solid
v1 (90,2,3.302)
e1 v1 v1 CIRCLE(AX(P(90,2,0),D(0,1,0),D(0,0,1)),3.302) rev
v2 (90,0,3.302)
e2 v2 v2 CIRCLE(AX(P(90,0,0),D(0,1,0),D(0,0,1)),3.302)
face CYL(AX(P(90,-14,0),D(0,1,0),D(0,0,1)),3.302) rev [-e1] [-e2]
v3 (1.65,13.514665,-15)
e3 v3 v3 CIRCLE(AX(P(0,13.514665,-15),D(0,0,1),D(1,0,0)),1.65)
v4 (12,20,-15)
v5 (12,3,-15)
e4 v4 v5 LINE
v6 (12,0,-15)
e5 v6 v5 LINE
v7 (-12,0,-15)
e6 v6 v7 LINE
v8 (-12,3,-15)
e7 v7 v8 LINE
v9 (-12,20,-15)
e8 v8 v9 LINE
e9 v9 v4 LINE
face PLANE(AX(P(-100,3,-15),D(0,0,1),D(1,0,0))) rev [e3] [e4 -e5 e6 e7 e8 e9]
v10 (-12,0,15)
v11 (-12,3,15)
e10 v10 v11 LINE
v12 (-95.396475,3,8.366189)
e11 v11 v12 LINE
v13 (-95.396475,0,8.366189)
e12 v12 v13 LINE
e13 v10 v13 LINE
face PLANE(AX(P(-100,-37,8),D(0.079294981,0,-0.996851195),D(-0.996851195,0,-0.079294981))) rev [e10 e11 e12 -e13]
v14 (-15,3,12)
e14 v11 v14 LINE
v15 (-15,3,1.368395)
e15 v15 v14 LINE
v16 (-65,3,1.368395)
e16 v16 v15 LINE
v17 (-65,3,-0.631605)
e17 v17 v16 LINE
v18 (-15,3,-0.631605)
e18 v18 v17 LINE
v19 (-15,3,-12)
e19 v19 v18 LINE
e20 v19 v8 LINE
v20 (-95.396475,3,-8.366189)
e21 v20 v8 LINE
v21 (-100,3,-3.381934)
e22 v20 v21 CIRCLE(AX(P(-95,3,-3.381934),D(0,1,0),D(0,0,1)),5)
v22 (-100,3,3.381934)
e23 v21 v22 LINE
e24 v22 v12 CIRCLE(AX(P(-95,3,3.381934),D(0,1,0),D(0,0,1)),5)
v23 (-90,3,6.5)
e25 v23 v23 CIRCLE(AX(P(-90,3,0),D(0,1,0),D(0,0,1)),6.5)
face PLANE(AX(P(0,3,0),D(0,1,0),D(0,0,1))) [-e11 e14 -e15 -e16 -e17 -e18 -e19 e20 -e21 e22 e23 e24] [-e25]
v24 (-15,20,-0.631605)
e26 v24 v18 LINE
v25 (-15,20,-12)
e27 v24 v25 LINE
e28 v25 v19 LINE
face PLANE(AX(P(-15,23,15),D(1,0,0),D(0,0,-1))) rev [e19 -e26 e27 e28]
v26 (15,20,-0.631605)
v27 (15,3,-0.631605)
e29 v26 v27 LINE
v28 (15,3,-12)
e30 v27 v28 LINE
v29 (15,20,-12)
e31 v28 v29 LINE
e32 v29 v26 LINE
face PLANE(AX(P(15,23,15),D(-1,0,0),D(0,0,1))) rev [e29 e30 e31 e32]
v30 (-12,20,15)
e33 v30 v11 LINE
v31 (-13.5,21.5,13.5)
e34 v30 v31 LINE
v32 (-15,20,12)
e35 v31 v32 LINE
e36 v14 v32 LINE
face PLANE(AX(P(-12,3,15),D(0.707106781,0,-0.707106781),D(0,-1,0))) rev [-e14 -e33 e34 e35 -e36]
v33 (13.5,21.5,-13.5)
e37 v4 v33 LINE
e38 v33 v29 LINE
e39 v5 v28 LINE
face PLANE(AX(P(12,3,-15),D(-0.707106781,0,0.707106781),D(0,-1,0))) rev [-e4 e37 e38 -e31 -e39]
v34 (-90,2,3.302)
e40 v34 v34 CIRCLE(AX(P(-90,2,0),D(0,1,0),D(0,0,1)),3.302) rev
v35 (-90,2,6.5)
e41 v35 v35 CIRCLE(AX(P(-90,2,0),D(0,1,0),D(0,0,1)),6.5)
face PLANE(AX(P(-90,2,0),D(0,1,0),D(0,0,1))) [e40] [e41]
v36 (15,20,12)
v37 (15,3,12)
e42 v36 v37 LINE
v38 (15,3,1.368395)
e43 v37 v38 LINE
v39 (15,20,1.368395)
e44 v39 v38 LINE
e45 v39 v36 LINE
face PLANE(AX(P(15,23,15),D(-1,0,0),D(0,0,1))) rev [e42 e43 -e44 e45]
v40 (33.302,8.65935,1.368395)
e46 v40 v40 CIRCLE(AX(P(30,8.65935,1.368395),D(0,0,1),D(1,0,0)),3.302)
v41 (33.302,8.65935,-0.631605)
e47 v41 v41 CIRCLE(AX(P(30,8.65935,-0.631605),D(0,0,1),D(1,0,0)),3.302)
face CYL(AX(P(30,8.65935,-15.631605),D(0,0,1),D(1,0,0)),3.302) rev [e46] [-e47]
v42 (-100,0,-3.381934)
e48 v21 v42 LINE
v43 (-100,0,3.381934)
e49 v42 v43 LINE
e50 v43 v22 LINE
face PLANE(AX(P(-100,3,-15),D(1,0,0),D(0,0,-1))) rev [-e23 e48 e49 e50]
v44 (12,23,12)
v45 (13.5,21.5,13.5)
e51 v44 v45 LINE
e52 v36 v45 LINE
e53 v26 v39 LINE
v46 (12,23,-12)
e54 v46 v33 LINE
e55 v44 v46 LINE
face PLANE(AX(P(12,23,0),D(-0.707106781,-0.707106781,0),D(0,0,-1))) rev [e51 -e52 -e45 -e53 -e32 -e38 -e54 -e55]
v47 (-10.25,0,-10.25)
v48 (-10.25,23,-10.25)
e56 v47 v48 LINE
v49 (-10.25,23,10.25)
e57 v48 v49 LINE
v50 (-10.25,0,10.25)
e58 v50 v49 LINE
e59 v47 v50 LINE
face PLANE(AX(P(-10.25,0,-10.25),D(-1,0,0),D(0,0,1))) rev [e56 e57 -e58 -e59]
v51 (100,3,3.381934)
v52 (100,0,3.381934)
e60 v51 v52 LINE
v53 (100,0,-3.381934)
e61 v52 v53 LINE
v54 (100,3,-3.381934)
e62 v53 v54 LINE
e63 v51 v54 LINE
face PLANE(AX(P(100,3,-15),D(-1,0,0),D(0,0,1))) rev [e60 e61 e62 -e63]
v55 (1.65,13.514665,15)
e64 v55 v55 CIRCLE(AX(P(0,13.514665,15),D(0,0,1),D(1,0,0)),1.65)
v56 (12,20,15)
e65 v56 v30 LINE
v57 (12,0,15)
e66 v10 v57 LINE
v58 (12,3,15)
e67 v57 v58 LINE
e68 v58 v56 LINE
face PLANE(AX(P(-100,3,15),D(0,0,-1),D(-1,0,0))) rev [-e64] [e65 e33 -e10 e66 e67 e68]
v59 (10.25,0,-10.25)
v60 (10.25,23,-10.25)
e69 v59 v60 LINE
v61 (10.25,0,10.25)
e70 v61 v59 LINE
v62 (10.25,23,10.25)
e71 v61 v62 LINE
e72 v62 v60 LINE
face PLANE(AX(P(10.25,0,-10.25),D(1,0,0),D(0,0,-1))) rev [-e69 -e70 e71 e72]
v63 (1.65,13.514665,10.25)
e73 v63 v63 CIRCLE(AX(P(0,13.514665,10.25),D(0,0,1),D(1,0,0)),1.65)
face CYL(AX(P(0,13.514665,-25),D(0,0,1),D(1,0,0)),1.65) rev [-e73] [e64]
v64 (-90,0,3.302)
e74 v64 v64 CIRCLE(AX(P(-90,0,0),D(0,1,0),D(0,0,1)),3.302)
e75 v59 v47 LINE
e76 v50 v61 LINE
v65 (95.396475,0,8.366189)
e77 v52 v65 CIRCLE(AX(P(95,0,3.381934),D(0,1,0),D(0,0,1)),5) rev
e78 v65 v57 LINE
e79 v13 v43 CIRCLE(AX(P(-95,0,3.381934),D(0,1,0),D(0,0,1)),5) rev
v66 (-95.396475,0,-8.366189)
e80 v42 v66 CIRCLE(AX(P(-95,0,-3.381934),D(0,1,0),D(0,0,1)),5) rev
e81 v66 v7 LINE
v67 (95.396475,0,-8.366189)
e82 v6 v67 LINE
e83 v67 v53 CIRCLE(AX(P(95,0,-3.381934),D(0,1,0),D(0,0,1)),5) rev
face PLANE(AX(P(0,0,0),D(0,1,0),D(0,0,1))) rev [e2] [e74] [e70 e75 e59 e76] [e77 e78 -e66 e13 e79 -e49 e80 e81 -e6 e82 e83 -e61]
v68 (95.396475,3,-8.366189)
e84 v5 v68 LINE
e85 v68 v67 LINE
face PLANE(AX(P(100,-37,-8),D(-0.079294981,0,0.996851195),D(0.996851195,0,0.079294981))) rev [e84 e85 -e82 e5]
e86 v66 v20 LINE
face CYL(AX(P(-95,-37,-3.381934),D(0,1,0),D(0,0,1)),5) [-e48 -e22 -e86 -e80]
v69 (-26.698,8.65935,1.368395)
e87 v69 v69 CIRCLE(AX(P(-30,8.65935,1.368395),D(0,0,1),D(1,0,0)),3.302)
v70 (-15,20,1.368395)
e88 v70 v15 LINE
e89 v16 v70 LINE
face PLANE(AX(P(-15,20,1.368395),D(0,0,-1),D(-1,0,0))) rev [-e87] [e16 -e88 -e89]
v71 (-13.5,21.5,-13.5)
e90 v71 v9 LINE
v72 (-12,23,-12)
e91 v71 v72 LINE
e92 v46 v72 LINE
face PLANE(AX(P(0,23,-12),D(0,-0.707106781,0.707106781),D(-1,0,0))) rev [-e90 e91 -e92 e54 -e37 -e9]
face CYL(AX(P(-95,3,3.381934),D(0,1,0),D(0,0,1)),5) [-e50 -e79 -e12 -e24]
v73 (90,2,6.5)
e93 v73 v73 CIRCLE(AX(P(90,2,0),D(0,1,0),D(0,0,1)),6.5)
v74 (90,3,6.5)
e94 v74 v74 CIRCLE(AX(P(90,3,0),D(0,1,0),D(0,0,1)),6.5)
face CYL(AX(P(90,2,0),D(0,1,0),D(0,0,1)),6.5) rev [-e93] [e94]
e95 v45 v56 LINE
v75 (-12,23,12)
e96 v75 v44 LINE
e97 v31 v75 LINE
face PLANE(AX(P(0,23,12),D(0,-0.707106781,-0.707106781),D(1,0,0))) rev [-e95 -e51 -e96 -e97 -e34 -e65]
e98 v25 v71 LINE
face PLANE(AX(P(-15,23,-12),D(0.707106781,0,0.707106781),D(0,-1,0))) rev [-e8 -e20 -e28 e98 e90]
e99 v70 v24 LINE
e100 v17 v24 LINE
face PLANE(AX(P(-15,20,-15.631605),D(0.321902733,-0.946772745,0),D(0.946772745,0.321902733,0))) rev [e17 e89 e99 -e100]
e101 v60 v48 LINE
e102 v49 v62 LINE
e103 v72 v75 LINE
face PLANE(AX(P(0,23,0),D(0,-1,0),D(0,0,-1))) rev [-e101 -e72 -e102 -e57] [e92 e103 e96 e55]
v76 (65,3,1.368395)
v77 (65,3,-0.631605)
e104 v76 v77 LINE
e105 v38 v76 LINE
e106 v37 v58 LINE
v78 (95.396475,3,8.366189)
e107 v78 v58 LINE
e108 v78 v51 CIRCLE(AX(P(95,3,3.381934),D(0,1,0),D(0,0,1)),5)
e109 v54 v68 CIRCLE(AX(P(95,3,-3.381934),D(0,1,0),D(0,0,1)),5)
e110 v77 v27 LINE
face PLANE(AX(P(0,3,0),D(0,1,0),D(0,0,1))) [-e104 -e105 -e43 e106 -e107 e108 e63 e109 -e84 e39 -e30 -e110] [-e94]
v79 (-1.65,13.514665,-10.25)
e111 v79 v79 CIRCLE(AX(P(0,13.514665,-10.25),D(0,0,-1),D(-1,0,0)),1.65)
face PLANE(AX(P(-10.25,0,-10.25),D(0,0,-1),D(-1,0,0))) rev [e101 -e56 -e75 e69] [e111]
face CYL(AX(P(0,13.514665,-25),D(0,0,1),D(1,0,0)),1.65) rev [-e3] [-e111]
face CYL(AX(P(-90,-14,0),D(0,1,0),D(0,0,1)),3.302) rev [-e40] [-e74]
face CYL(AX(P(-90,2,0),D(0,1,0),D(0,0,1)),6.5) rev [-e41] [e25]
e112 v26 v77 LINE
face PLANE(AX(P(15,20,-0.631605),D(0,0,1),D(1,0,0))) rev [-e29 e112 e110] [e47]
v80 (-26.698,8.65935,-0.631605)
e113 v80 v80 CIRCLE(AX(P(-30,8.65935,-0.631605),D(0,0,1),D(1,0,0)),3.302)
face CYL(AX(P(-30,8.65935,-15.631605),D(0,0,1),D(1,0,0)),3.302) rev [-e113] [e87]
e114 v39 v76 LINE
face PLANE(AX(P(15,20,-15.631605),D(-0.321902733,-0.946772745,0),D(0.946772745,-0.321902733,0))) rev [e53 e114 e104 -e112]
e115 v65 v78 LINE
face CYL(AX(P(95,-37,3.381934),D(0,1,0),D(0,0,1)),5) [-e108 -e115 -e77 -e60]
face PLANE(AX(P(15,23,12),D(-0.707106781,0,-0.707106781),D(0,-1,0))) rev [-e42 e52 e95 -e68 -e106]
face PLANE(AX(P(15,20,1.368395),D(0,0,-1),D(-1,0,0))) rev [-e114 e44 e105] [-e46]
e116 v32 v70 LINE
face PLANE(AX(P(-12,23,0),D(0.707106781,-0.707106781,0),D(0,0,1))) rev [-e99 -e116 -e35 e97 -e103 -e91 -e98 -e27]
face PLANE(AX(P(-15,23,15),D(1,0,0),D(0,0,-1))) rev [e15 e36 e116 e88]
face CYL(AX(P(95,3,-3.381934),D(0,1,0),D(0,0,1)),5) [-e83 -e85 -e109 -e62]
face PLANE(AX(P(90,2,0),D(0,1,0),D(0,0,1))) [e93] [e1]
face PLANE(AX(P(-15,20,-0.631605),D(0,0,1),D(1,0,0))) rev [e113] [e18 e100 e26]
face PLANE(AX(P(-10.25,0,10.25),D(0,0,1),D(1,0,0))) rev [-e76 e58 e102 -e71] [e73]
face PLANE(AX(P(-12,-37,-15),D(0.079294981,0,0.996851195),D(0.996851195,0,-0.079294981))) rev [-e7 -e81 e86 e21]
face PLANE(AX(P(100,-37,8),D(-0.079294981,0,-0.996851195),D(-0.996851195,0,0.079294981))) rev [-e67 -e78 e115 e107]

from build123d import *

# Parameters (mm, degrees)
SKETCH1_W           = 200
SKETCH1_H           = 30
BOSS_EXTRUDE1_DEPTH = 3
SKETCH2_W           = 20.5
SKETCH2_H           = 20.5
CUT_EXTRUDE1_DEPTH  = 3
SKETCH3_W           = 30
SKETCH3_H           = 30
SKETCH3_W_2         = 20.5
SKETCH3_H_2         = 20.5
BOSS_EXTRUDE2_DEPTH = 20
CHAMFER1_SIZE       = 3
SKETCH4_R           = 1.65
CUT_EXTRUDE2_DEPTH  = 40
CHAMFER2_SIZE       = 3
CUT_EXTRUDE3_DEPTH  = 40
SKETCH6_W           = 50
SKETCH6_H           = 2
BOSS_EXTRUDE3_DEPTH = 17
CUT_EXTRUDE4_DEPTH  = 17
SKETCH8_R           = 3.302
CUT_EXTRUDE5_DEPTH  = 17
SKETCH9_R           = 3.302
CUT_EXTRUDE6_DEPTH  = 17
SKETCH10_R          = 6.5
CUT_EXTRUDE7_DEPTH  = 1
SKETCH11_R          = 6.5
CUT_EXTRUDE8_DEPTH  = 1
FILLET1_R           = 5


with BuildPart() as part:
    # Sketch1 → Boss-Extrude1 (new body)
    with BuildSketch(Plane(origin=(0, 0, 0), x_dir=(1, 0, 0), z_dir=(0, 1, 0))):
        Rectangle(SKETCH1_W, SKETCH1_H)
    extrude(amount=BOSS_EXTRUDE1_DEPTH)

    # Sketch2 → Cut-Extrude1 (cut)
    with BuildSketch(Plane(origin=(0, 3, 0), x_dir=(1, 0, 0), z_dir=(0, 1, 0))):
        Rectangle(SKETCH2_W, SKETCH2_H)
    extrude(amount=-CUT_EXTRUDE1_DEPTH, mode=Mode.SUBTRACT)

    # Sketch3 → Boss-Extrude2 (add)
    with BuildSketch(Plane(origin=(0, 3, 0), x_dir=(1, 0, 0), z_dir=(0, 1, 0))):
        Rectangle(SKETCH3_W, SKETCH3_H)
        Rectangle(SKETCH3_W_2, SKETCH3_H_2, mode=Mode.SUBTRACT)
    extrude(amount=BOSS_EXTRUDE2_DEPTH)

    # Chamfer1
    chamfer1_edges = [part.edges().sort_by_distance(p)[0] for p in [
        (15, 13, 15),
        (15, 13, -15),
        (-15, 13, -15),
        (-15, 13, 15),
    ]]
    chamfer(chamfer1_edges, length=CHAMFER1_SIZE)

    # Sketch4 → Cut-Extrude2 (cut)
    with BuildSketch(Plane.XY.offset(15)):
        with Locations((0, 13.514664597)):
            Circle(SKETCH4_R)
    extrude(amount=-CUT_EXTRUDE2_DEPTH, mode=Mode.SUBTRACT)

    # Chamfer2
    # the kernel refuses this chamfer: 3 mm, written as the material it takes off along each edge
    with BuildSketch(Plane(origin=(19.715048964, 23, -15), x_dir=(0, -0.9996219169112968, -0.02749587661058619), z_dir=(-1, 0, 0))) as chamfer2_piece_1:
        Polygon((CHAMFER2_SIZE * 0.999621916911, CHAMFER2_SIZE * 0.0274958766106), (-CHAMFER2_SIZE * 0.0274958766106, CHAMFER2_SIZE * 0.999621916911), (0, 0), align=None)
    extrude(amount=39.430097928, mode=Mode.SUBTRACT)
    with BuildSketch(Plane(origin=(15, 23, 19.715048964), x_dir=(-0.9996219169112968, 0.02749587661058678, 0), z_dir=(0, 0, -1)), Plane(origin=(-19.715048964, 23, 15), x_dir=(0, 0.02749587661058678, -0.9996219169112968), z_dir=(1, 0, 0)), Plane(origin=(-15, 23, -19.715048964), x_dir=(0.9996219169112968, 0.02749587661058678, 0), z_dir=(0, 0, 1))) as chamfer2_piece_2:
        Polygon((CHAMFER2_SIZE * 0.999621916911, -CHAMFER2_SIZE * 0.0274958766106), (-CHAMFER2_SIZE * 0.0274958766106, -CHAMFER2_SIZE * 0.999621916911), (0, 0), align=None)
    extrude(amount=39.430097928, mode=Mode.SUBTRACT)

    # Sketch5 → Cut-Extrude3 (cut)
    with BuildSketch(Plane(origin=(0, 3, 0), x_dir=(1, 0, 0), z_dir=(0, 1, 0))):
        Polygon((-12, 15), (-100, 8), (-100, 15), align=None)
        Polygon((-12, -15), (-100, -15), (-100, -8), align=None)
        Polygon((12, 15), (100, 15), (100, 8), align=None)
        Polygon((12, -15), (100, -15), (100, -8), align=None)
    extrude(amount=-CUT_EXTRUDE3_DEPTH, mode=Mode.SUBTRACT)

    # Sketch6 → Boss-Extrude3 (add)
    with BuildSketch(Plane(origin=(0, 3, 0), x_dir=(1, 0, 0), z_dir=(0, 1, 0))):
        with Locations((-40, -0.368394866)):
            Rectangle(SKETCH6_W, SKETCH6_H)
        with Locations((40, -0.368394866)):
            Rectangle(SKETCH6_W, SKETCH6_H)
    extrude(amount=BOSS_EXTRUDE3_DEPTH)

    # Sketch7 → Cut-Extrude4 (cut)
    with BuildSketch(Plane.XY.offset(1.368394866)):
        Polygon((-15, 20), (-65, 3), (-71.38859119, 29.520775186), align=None)
        Polygon((15, 20), (65, 3), (84.413316585, 43.135600108), align=None)
    extrude(amount=-CUT_EXTRUDE4_DEPTH, mode=Mode.SUBTRACT)

    # Sketch8 → Cut-Extrude5 (cut)
    with BuildSketch(Plane.XY.offset(1.368394866)):
        with Locations((-30, 8.659349902)):
            Circle(SKETCH8_R)
        with Locations((30, 8.659349902)):
            Circle(SKETCH8_R)
    extrude(amount=-CUT_EXTRUDE5_DEPTH, mode=Mode.SUBTRACT)

    # Sketch9 → Cut-Extrude6 (cut)
    with BuildSketch(Plane(origin=(0, 3, 0), x_dir=(1, 0, 0), z_dir=(0, 1, 0))):
        with Locations(Location((-90, 0, 0), (0, 0, 270))):
            Circle(SKETCH9_R)
        with Locations(Location((90, 0, 0), (0, 0, 270))):
            Circle(SKETCH9_R)
    extrude(amount=-CUT_EXTRUDE6_DEPTH, mode=Mode.SUBTRACT)

    # Sketch10 → Cut-Extrude7 (cut)
    with BuildSketch(Plane(origin=(0, 3, 0), x_dir=(1, 0, 0), z_dir=(0, 1, 0))):
        with Locations(Location((90, 0, 0), (0, 0, 270))):
            Circle(SKETCH10_R)
    extrude(amount=-CUT_EXTRUDE7_DEPTH, mode=Mode.SUBTRACT)

    # Sketch11 → Cut-Extrude8 (cut)
    with BuildSketch(Plane(origin=(0, 3, 0), x_dir=(1, 0, 0), z_dir=(0, 1, 0))):
        with Locations(Location((-90, 0, 0), (0, 0, 270))):
            Circle(SKETCH11_R)
    extrude(amount=-CUT_EXTRUDE8_DEPTH, mode=Mode.SUBTRACT)

    # Fillet1
    fillet1_edges = [part.edges().sort_by_distance(p)[0] for p in [
        (-100, 1.5, -8),
        (-100, 1.5, 8),
        (100, 1.5, -8),
        (100, 1.5, 8),
    ]]
    fillet(fillet1_edges, radius=FILLET1_R)


solid = part.part
